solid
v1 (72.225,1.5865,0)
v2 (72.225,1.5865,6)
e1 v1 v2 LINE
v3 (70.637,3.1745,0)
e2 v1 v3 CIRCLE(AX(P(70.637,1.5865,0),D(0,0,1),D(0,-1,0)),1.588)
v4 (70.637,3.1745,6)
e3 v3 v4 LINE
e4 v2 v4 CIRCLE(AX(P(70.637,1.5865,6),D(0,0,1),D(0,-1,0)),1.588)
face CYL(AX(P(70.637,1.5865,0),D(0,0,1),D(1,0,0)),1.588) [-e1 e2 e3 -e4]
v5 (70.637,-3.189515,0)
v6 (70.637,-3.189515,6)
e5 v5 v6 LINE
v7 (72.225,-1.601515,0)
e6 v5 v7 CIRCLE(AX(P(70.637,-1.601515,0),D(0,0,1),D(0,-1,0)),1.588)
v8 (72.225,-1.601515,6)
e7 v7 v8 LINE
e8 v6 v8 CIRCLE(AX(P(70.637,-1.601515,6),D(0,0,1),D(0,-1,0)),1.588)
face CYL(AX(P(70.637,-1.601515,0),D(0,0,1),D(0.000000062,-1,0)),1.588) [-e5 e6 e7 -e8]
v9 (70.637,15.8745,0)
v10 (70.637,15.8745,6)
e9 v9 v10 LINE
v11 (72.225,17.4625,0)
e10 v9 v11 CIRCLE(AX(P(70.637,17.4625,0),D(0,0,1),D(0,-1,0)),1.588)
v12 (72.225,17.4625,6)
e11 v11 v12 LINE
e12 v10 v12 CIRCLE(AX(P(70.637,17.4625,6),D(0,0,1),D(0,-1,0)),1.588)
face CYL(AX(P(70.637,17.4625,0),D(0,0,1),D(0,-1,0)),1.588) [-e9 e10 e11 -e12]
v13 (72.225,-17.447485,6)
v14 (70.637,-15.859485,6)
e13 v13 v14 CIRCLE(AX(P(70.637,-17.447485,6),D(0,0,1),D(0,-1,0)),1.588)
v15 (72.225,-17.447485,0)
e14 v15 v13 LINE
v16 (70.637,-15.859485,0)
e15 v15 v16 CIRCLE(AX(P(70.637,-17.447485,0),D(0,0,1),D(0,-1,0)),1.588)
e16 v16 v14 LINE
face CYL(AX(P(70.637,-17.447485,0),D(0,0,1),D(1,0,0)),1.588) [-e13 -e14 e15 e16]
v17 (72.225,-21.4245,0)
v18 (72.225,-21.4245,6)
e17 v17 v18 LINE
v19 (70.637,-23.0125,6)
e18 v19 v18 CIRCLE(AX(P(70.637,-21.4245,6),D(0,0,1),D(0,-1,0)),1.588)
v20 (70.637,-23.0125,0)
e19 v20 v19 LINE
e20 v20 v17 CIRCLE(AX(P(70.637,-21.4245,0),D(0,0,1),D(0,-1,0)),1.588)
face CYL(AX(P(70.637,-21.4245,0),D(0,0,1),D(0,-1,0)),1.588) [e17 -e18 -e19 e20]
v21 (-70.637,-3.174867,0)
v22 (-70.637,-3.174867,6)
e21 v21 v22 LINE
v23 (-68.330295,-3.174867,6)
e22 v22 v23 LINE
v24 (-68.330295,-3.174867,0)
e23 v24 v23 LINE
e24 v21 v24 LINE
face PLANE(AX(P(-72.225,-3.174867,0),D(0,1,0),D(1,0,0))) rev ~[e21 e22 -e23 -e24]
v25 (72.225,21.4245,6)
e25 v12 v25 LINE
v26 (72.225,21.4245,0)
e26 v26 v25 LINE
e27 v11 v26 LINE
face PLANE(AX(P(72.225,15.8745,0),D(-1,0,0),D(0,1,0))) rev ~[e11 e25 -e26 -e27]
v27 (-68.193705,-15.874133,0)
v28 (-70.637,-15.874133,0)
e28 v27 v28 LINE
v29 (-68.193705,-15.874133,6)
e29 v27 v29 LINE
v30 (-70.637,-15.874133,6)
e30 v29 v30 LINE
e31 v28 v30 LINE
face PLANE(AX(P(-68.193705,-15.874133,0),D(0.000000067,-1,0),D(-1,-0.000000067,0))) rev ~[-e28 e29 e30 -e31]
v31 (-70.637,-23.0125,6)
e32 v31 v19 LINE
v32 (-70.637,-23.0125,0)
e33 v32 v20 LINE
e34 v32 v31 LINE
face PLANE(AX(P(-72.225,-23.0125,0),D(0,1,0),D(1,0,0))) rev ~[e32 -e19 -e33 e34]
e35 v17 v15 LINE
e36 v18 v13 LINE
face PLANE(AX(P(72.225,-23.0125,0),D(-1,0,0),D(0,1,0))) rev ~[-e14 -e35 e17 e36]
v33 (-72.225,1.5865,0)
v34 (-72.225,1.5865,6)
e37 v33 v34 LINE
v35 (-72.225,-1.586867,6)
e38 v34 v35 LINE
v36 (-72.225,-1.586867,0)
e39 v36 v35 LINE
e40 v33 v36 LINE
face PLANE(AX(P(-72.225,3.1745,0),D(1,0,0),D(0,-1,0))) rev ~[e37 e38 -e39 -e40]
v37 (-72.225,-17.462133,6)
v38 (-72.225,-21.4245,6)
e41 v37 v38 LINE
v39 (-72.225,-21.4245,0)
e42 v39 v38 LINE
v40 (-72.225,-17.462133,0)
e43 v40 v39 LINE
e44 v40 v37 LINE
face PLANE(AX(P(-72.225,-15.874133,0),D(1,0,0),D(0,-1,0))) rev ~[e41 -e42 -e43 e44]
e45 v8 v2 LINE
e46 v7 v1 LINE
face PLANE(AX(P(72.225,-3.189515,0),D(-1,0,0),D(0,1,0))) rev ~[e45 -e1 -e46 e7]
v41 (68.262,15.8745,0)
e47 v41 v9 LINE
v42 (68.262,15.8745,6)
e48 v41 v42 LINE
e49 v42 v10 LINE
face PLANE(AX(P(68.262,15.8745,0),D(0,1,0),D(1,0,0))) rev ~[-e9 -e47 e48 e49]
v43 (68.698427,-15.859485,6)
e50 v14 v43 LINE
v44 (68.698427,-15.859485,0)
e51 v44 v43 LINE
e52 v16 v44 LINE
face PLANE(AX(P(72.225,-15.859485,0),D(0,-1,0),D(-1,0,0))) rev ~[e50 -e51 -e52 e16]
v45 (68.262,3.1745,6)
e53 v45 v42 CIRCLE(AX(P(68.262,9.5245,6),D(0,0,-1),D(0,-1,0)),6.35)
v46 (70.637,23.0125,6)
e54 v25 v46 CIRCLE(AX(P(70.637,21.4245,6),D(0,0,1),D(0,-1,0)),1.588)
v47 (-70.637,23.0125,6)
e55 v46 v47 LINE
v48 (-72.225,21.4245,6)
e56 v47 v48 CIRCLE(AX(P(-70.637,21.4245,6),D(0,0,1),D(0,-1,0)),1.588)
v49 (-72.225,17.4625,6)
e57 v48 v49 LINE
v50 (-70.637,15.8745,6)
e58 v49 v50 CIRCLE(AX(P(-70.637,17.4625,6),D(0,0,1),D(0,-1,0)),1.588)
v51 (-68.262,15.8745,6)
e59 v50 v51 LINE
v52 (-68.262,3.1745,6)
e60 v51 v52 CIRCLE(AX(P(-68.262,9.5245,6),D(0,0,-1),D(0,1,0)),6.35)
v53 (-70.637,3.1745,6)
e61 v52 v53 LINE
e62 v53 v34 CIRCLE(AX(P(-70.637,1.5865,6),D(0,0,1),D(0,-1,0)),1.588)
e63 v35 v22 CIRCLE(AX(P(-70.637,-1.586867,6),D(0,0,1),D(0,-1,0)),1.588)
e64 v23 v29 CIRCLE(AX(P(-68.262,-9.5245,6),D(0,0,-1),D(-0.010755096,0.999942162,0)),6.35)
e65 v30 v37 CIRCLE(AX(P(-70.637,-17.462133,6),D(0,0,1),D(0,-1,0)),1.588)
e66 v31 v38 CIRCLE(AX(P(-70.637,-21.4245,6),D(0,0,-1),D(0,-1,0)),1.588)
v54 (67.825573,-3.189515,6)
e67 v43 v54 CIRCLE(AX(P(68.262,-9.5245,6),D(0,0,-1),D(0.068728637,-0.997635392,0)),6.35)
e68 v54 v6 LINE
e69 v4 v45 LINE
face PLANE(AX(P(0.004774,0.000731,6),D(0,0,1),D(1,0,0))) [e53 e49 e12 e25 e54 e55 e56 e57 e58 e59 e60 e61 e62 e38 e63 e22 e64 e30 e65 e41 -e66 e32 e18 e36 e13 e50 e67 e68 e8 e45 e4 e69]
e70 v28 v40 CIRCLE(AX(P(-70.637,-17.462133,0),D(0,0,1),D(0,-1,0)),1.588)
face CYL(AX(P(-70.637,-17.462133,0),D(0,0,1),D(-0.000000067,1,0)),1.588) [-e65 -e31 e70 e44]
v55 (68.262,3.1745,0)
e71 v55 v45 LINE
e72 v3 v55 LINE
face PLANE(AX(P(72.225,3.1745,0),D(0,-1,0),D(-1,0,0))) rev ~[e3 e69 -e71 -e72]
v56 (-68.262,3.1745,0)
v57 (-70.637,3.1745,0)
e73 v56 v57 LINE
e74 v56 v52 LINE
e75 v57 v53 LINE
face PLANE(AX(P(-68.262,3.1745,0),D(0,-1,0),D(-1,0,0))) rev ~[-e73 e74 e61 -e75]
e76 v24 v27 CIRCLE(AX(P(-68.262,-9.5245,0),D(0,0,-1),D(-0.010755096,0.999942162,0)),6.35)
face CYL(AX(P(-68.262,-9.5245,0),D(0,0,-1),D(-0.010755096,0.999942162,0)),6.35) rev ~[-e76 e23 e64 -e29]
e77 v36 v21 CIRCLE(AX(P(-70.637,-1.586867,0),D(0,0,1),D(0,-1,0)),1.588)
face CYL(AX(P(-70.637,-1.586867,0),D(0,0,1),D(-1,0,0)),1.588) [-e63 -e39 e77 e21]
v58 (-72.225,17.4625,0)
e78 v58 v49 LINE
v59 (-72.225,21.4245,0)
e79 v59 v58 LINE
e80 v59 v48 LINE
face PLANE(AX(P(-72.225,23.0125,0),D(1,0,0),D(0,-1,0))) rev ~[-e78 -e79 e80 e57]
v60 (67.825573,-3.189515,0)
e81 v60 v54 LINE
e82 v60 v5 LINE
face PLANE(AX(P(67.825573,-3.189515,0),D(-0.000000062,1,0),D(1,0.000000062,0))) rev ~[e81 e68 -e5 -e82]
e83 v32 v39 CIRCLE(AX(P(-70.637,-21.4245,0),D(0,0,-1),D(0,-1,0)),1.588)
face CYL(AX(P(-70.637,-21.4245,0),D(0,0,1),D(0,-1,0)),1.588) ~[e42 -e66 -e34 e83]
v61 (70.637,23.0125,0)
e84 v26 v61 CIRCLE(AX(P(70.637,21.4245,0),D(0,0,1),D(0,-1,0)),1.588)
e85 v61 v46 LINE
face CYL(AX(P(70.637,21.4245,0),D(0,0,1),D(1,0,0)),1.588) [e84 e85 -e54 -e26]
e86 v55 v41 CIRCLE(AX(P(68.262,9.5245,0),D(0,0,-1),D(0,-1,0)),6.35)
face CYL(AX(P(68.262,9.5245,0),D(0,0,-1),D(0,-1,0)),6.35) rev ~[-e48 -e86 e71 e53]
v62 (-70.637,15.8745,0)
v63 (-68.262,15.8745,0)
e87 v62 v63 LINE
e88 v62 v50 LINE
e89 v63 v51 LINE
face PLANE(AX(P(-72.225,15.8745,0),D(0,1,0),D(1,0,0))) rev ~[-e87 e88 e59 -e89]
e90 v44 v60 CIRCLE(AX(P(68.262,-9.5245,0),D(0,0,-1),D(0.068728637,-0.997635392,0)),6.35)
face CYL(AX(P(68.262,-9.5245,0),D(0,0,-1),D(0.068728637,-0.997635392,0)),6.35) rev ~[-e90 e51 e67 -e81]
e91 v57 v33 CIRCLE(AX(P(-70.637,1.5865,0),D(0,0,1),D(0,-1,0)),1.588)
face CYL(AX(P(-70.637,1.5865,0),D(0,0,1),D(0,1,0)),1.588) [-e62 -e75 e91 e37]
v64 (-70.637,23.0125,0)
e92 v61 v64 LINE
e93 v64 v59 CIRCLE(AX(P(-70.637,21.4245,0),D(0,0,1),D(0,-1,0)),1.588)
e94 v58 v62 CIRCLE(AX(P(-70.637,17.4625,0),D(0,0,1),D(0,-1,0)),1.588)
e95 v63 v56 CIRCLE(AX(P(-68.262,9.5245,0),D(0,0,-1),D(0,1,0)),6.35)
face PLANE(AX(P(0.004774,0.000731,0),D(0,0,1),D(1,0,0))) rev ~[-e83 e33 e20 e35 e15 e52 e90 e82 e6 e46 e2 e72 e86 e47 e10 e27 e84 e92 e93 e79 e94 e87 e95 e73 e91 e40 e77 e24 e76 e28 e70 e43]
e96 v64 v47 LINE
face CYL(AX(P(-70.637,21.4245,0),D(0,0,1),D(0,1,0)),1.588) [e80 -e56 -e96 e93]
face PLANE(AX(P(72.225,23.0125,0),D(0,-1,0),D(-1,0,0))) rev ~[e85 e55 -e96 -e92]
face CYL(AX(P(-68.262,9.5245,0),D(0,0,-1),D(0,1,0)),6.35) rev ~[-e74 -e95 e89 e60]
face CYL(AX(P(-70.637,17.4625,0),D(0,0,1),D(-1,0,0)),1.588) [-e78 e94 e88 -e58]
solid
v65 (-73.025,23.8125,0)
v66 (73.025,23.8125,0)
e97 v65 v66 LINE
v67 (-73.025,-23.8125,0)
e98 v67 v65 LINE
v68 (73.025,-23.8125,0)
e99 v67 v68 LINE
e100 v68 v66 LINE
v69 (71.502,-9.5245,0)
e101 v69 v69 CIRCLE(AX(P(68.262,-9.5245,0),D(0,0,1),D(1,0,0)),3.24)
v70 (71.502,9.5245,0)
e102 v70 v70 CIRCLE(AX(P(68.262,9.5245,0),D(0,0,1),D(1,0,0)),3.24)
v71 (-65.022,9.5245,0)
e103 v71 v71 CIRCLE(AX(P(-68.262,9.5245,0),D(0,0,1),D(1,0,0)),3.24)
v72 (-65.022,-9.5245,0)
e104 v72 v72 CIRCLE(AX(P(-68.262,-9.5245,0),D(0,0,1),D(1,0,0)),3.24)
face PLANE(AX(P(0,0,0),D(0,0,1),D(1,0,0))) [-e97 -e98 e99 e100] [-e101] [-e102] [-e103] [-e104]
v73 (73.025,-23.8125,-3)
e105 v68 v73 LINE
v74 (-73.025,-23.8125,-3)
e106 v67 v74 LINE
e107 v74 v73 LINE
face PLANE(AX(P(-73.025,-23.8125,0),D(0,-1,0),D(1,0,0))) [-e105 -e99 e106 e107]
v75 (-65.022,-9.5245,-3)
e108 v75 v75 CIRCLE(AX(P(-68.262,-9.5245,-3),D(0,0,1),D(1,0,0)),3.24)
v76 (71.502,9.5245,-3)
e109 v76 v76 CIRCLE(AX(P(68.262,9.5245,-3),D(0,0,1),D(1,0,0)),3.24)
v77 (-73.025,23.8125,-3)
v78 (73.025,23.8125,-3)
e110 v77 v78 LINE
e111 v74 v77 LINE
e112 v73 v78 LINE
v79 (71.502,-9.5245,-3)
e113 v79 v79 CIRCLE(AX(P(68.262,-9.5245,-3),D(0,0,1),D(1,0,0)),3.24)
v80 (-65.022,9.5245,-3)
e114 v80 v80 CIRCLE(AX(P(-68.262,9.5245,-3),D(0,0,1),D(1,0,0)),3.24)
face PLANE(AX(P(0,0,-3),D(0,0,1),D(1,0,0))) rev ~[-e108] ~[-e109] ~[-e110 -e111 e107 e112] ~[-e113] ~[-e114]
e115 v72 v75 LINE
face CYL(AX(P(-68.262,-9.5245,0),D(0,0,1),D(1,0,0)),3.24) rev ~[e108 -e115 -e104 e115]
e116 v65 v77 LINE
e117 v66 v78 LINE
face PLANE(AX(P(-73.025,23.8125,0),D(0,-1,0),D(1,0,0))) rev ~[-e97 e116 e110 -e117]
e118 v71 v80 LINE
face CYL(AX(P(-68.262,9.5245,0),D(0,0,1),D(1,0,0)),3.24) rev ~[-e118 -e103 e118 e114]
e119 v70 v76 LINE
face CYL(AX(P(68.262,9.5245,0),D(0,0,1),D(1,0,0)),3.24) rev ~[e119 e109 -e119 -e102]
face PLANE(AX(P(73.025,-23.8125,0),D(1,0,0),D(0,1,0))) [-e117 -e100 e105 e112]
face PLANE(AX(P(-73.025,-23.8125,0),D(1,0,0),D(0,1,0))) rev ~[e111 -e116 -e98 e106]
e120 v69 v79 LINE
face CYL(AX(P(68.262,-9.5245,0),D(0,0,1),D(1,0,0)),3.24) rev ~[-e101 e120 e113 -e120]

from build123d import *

# Parameters (mm, degrees)
F0_W     = 146.05
F0_H     = 47.625
F0_R     = 3.24
F1_DEPTH = 3
F2_DEPTH = 6
F3_R     = 1.588


# Not quite as in the source:
# - ends of sketch curves that miss each other by under 0.0002 mm in the source are joined


with BuildPart() as f1:
    # F0 (on Top) → F1 (new body)
    with BuildSketch(Plane.XY):
        Rectangle(F0_W, F0_H)
        with Locations((-68.262, -9.5245)):
            Circle(F0_R, mode=Mode.SUBTRACT)
        with Locations((68.262, -9.5245)):
            Circle(F0_R, mode=Mode.SUBTRACT)
        with Locations((-68.262, 9.5245)):
            Circle(F0_R, mode=Mode.SUBTRACT)
        with BuildLine():
            Line((72.225, -15.859485), (72.225, -23.0125))
            Line((72.225, -23.0125), (-72.225, -23.0125))
            Line((-72.225, -23.0125), (-72.225, -15.874133))
            Line((-72.225, -15.874133), (-68.193705, -15.874133))
            ThreePointArc((-68.193705, -15.874133), (-61.912367271, -9.4562050029), (-68.3302949971, -3.174867271))
            Line((-68.3302949971, -3.174867271), (-72.225, -3.174867))
            Line((-72.225, -3.174867), (-72.225, 3.1745))
            Line((-72.225, 3.1745), (-68.262, 3.1745))
            ThreePointArc((-68.262, 3.1745), (-61.912, 9.5245), (-68.262, 15.8745))
            Line((-68.262, 15.8745), (-72.225, 15.8745))
            Line((-72.225, 15.8745), (-72.225, 23.0125))
            Line((-72.225, 23.0125), (72.225, 23.0125))
            Line((72.225, 23.0125), (72.225, 15.8745))
            Line((72.225, 15.8745), (68.262, 15.8745))
            ThreePointArc((68.262, 15.8745), (61.912, 9.5245), (68.262, 3.1745))
            Line((68.262, 3.1745), (72.225, 3.1745))
            Line((72.225, 3.1745), (72.225, -3.189515))
            Line((72.225, -3.189515), (67.825573, -3.189515))
            ThreePointArc((67.825573, -3.189515), (61.9270152731, -9.9609269812), (68.6984269812, -15.8594847269))
            Line((68.6984269812, -15.8594847269), (72.225, -15.859485))
        make_face(mode=Mode.SUBTRACT)
        with Locations((68.262, 9.5245)):
            Circle(F0_R, mode=Mode.SUBTRACT)
        with BuildLine():
            Line((-72.225, -23.0125), (72.225, -23.0125))
            Line((72.225, -23.0125), (72.225, -15.859485))
            Line((72.225, -15.859485), (68.698427, -15.859485))
            ThreePointArc((68.698427, -15.859485), (61.9270152731, -9.9609269812), (67.8255730188, -3.1895152731))
            Line((67.8255730188, -3.1895152731), (72.225, -3.189515))
            Line((72.225, -3.189515), (72.225, 3.1745))
            Line((72.225, 3.1745), (68.262, 3.1745))
            ThreePointArc((68.262, 3.1745), (61.912, 9.5245), (68.262, 15.8745))
            Line((68.262, 15.8745), (72.225, 15.8745))
            Line((72.225, 15.8745), (72.225, 23.0125))
            Line((72.225, 23.0125), (-72.225, 23.0125))
            Line((-72.225, 23.0125), (-72.225, 15.8745))
            Line((-72.225, 15.8745), (-68.262, 15.8745))
            ThreePointArc((-68.262, 15.8745), (-61.912, 9.5245), (-68.262, 3.1745))
            Line((-68.262, 3.1745), (-72.225, 3.1745))
            Line((-72.225, 3.1745), (-72.225, -3.174867))
            Line((-72.225, -3.174867), (-68.330295, -3.174867))
            ThreePointArc((-68.330295, -3.174867), (-61.912367271, -9.4562050029), (-68.1937050029, -15.874132729))
            Line((-68.1937050029, -15.874132729), (-72.225, -15.874133))
            Line((-72.225, -15.874133), (-72.225, -23.0125))
        make_face()
    extrude(amount=-F1_DEPTH)


with BuildPart() as f2:
    # F0 (on Top) → F2 (new body)
    with BuildSketch(Plane.XY):
        with BuildLine():
            Line((-72.225, -23.0125), (72.225, -23.0125))
            Line((72.225, -23.0125), (72.225, -15.859485))
            Line((72.225, -15.859485), (68.698427, -15.859485))
            ThreePointArc((68.698427, -15.859485), (61.9270152731, -9.9609269812), (67.8255730188, -3.1895152731))
            Line((67.8255730188, -3.1895152731), (72.225, -3.189515))
            Line((72.225, -3.189515), (72.225, 3.1745))
            Line((72.225, 3.1745), (68.262, 3.1745))
            ThreePointArc((68.262, 3.1745), (61.912, 9.5245), (68.262, 15.8745))
            Line((68.262, 15.8745), (72.225, 15.8745))
            Line((72.225, 15.8745), (72.225, 23.0125))
            Line((72.225, 23.0125), (-72.225, 23.0125))
            Line((-72.225, 23.0125), (-72.225, 15.8745))
            Line((-72.225, 15.8745), (-68.262, 15.8745))
            ThreePointArc((-68.262, 15.8745), (-61.912, 9.5245), (-68.262, 3.1745))
            Line((-68.262, 3.1745), (-72.225, 3.1745))
            Line((-72.225, 3.1745), (-72.225, -3.174867))
            Line((-72.225, -3.174867), (-68.330295, -3.174867))
            ThreePointArc((-68.330295, -3.174867), (-61.912367271, -9.4562050029), (-68.1937050029, -15.874132729))
            Line((-68.1937050029, -15.874132729), (-72.225, -15.874133))
            Line((-72.225, -15.874133), (-72.225, -23.0125))
        make_face()
    extrude(amount=F2_DEPTH)

    # F3
    f3_edges = [f2.edges().sort_by_distance(p)[0] for p in [
        (-72.225, 23.0125, 3),
        (-72.225, 15.8745, 3),
        (-72.225, 3.1745, 3),
        (-72.225, -3.174867, 3),
        (-72.225, -15.874133, 3),
        (-72.225, -23.0125, 3),
        (72.225, -23.0125, 3),
        (72.225, -15.859485, 3),
        (72.225, -3.189515, 3),
        (72.225, 3.1745, 3),
        (72.225, 23.0125, 3),
        (72.225, 15.8745, 3),
    ]]
    fillet(f3_edges, radius=F3_R)


solid = Compound([f1.part, f2.part])
